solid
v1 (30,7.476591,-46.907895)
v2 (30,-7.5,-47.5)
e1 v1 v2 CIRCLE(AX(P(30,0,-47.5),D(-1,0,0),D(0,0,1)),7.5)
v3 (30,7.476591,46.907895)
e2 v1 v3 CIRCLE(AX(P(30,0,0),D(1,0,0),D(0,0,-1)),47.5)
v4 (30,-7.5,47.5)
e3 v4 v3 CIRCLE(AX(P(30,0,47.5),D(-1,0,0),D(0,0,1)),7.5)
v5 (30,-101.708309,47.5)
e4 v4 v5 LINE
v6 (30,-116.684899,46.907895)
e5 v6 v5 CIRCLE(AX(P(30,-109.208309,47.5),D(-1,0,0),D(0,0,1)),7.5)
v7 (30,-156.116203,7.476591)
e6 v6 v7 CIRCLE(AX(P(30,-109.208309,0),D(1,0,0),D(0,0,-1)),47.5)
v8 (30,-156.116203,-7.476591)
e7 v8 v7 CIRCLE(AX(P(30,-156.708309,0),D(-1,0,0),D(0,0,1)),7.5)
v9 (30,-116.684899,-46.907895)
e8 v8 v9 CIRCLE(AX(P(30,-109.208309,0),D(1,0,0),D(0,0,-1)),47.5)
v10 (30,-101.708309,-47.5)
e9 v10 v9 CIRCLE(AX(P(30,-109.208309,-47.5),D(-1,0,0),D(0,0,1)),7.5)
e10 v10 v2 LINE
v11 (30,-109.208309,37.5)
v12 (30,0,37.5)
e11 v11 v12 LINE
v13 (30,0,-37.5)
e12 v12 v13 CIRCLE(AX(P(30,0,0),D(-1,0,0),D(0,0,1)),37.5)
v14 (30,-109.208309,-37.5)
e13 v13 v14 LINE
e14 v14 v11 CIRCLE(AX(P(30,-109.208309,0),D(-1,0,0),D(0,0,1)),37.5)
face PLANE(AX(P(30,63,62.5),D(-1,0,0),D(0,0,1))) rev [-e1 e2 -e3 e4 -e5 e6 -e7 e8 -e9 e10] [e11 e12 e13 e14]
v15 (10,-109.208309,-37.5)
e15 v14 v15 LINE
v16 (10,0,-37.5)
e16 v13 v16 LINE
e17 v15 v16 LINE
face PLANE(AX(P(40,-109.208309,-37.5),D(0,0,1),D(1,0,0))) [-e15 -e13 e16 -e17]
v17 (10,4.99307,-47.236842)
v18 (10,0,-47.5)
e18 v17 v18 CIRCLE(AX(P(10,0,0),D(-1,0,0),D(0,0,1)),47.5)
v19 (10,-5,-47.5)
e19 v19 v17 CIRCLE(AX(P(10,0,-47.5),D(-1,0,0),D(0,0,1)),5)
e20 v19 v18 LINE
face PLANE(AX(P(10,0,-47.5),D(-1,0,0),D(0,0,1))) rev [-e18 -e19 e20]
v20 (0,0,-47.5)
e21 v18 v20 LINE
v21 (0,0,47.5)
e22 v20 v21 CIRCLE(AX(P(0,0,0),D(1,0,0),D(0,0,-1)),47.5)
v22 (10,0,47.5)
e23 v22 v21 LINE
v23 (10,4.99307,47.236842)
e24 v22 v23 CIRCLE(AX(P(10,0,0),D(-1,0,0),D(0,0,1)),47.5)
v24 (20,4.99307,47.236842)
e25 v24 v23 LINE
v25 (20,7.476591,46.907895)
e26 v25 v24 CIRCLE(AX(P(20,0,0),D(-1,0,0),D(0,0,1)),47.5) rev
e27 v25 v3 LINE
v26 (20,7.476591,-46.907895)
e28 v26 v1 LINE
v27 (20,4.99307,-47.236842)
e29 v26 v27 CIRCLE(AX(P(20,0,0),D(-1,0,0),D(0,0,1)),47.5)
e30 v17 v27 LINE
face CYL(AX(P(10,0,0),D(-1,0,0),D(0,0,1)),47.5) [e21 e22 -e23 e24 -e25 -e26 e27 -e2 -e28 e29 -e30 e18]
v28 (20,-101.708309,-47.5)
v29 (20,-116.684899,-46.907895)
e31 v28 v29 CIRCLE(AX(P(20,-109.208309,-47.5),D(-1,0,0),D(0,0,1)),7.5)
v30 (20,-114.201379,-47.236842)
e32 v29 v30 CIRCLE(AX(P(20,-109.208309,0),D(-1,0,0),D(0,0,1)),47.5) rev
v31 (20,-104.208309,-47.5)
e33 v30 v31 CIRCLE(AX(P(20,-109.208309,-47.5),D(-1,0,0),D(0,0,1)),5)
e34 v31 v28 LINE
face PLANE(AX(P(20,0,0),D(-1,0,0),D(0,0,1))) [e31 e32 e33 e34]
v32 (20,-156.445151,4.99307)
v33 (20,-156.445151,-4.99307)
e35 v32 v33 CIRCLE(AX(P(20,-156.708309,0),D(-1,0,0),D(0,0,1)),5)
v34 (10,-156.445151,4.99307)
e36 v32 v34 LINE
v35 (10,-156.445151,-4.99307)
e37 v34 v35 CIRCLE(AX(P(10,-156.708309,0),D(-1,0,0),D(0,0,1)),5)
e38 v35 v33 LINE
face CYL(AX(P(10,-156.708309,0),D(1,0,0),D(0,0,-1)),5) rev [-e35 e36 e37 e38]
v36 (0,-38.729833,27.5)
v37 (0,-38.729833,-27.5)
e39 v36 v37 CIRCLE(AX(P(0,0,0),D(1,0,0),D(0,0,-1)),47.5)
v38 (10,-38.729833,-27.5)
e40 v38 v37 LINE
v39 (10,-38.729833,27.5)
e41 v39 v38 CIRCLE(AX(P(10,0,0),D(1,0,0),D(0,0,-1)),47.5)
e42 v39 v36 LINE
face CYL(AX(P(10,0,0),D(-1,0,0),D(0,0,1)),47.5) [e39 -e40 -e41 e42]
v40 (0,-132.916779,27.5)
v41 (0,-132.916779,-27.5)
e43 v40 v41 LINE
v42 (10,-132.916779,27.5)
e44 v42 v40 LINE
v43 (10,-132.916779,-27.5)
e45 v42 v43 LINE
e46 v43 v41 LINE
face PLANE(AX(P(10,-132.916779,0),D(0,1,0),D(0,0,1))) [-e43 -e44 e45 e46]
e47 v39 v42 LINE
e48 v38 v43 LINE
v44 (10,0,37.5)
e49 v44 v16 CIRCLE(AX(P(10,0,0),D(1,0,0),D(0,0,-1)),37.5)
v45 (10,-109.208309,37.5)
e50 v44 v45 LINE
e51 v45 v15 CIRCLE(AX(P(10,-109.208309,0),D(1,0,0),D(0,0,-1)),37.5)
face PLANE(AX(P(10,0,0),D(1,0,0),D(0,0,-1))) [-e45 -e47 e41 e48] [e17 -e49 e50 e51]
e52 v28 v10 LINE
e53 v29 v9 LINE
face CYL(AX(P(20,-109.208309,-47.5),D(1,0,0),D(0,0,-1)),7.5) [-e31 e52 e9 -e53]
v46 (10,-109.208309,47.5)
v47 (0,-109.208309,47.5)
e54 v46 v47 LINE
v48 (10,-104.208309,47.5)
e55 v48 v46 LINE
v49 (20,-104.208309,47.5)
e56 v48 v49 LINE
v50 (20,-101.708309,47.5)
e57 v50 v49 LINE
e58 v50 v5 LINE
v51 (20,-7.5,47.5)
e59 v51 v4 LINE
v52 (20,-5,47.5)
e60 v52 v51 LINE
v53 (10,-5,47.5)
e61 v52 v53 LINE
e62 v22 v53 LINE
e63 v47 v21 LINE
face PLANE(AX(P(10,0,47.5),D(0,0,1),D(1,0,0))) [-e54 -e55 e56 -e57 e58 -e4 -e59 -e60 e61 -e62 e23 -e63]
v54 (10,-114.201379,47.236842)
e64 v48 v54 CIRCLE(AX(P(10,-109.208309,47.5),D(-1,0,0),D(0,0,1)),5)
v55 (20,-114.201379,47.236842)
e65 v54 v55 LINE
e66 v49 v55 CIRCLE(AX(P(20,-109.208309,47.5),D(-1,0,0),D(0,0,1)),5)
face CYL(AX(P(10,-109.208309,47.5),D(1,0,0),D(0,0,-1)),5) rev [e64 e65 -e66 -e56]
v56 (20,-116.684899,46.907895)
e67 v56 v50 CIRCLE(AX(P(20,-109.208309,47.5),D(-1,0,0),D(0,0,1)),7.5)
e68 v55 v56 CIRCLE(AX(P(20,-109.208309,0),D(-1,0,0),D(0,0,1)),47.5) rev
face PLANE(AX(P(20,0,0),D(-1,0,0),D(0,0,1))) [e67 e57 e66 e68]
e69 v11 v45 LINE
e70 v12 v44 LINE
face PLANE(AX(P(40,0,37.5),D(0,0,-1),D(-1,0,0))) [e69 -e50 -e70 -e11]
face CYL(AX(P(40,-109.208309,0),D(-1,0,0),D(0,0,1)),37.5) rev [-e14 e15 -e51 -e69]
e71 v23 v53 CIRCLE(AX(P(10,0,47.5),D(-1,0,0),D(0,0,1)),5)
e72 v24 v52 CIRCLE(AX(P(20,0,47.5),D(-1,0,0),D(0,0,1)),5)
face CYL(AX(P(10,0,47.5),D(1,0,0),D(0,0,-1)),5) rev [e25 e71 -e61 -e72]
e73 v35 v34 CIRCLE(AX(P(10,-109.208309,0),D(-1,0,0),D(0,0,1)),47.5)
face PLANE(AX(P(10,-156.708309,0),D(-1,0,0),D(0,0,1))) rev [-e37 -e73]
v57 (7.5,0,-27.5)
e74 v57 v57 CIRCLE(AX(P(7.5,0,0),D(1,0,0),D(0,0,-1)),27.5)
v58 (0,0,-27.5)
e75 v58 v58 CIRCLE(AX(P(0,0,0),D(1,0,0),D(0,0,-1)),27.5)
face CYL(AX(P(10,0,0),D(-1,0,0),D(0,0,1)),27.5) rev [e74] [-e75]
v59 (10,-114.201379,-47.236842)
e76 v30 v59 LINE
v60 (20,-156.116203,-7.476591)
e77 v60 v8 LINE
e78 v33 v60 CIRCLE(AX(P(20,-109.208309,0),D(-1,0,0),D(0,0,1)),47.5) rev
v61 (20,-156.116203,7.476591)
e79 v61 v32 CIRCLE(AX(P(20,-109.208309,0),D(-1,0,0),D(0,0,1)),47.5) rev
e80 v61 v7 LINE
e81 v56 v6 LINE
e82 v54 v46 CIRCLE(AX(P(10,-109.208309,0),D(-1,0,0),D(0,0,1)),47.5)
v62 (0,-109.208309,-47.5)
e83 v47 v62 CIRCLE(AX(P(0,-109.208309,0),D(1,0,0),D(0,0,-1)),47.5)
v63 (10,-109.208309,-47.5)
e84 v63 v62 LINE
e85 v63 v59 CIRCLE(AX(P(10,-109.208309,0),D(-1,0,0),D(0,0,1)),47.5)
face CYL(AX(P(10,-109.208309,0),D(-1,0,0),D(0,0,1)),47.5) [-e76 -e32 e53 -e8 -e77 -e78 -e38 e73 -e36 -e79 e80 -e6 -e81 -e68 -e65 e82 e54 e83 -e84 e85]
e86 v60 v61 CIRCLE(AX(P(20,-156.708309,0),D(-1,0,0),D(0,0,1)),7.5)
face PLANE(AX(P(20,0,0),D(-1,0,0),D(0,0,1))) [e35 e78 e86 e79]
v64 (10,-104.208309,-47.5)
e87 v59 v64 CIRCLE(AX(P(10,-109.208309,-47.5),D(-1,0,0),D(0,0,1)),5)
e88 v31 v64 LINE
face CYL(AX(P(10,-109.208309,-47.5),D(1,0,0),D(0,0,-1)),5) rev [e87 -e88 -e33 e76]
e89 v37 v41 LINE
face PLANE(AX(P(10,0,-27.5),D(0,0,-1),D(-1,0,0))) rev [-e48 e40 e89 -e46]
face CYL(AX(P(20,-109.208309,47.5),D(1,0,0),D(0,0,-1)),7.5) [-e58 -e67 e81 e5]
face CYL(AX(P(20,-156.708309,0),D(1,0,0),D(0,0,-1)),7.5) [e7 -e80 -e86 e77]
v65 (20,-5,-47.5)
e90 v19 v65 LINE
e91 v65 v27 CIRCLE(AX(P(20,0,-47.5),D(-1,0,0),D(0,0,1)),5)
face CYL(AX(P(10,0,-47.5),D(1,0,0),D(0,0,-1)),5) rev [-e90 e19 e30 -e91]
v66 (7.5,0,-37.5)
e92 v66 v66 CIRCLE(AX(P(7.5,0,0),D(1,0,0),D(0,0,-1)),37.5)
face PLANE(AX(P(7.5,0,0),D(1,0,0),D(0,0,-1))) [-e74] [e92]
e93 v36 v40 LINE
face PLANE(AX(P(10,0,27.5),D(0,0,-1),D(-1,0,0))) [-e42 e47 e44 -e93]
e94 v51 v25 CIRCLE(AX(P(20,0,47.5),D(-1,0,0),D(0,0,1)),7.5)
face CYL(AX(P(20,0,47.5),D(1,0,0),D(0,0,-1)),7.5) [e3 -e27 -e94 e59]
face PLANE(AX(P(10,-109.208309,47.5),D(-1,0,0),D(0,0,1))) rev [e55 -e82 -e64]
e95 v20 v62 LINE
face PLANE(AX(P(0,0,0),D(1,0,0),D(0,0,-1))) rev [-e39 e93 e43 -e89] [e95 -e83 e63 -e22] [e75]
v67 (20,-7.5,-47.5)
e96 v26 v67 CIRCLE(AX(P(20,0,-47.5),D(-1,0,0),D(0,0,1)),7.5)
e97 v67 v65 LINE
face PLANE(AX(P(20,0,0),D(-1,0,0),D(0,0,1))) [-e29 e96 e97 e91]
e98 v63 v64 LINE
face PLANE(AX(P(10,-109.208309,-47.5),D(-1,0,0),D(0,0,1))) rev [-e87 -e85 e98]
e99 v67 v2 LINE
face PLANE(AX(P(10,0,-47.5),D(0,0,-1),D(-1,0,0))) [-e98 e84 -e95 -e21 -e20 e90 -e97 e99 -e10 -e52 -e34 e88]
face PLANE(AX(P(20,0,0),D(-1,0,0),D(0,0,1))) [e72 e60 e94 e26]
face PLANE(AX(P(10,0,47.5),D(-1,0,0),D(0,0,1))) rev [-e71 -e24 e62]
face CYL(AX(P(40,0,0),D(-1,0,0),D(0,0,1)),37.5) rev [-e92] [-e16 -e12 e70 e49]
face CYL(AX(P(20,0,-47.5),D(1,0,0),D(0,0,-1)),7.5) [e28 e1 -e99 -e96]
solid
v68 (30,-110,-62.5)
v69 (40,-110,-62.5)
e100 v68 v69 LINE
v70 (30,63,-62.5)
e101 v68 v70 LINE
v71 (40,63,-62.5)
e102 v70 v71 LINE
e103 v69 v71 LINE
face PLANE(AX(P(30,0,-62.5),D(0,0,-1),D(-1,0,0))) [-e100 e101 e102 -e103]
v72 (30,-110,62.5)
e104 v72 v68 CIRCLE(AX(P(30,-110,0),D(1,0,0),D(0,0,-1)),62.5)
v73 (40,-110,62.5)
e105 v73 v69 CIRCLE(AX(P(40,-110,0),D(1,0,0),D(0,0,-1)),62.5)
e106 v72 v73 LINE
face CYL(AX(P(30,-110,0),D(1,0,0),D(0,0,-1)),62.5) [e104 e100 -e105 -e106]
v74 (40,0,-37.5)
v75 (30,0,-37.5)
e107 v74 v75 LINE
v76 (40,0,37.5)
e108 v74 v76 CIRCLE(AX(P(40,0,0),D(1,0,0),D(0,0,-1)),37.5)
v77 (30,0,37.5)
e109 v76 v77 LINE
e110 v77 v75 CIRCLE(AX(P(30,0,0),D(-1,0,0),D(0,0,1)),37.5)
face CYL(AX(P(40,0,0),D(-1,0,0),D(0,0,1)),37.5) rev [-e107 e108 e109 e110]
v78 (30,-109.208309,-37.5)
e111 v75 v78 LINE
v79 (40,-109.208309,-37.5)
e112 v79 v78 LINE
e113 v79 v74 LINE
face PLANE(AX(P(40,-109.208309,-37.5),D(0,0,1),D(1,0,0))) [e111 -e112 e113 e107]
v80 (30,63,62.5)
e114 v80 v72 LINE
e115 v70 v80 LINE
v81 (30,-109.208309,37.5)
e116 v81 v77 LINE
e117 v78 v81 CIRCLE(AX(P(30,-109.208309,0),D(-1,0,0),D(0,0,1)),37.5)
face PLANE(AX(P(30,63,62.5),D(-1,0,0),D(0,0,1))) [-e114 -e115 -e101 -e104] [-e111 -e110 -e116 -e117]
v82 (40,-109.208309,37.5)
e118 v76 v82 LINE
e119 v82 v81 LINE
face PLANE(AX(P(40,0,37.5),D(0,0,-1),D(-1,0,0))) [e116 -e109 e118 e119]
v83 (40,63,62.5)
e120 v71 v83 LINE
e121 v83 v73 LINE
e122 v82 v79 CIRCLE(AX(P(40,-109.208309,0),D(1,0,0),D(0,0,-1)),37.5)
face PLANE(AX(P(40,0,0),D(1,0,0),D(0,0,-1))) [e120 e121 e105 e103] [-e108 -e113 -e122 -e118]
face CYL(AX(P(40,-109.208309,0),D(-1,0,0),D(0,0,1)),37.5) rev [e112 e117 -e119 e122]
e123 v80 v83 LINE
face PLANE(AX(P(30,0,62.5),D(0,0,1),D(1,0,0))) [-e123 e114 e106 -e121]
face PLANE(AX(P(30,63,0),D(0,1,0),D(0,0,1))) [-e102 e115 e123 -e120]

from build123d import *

# Parameters (mm, degrees)
SKETCH1_R           = 27.5
BOSS_EXTRUDE1_DEPTH = 10
BOSS_EXTRUDE2_DEPTH = 30
BOSS_EXTRUDE4_START = -10
BOSS_EXTRUDE4_DEPTH = 10
CUT_EXTRUDE1_START  = -2.5
SKETCH7_R           = 37.5
SKETCH7_R_2         = 27.25
CUT_EXTRUDE1_DEPTH  = 2.5
BOSS_EXTRUDE5_START = 10
BOSS_EXTRUDE5_DEPTH = 10
SKETCH9_R           = 5
CUT_EXTRUDE2_DEPTH  = 10


# Read off the part's stored shape, not the designer's step: Split1
with BuildPart() as part:
    # Sketch1 → Boss-Extrude1 (new body)
    with BuildSketch(Plane(origin=(0, 0, 0), x_dir=(0, 0, -1), z_dir=(1, 0, 0))):
        with BuildLine():
            Line((47.5, 0), (47.5, -109.208308594))
            ThreePointArc((47.5, -109.208308594), (0, -156.708308594), (-47.5, -109.208308594))
            Line((-47.5, -109.208308594), (-47.5, 0))
            ThreePointArc((-47.5, 0), (0, 47.5), (47.5, 0))
        make_face()
        Circle(SKETCH1_R, mode=Mode.SUBTRACT)
        with BuildLine():
            Line((27.5, -38.729833462), (27.5, -132.916779119))
            Line((27.5, -132.916779119), (-27.5, -132.916779119))
            Line((-27.5, -132.916779119), (-27.5, -38.729833462))
            ThreePointArc((-27.5, -38.729833462), (0, -47.5), (27.5, -38.729833462))
        make_face(mode=Mode.SUBTRACT)
    extrude(amount=BOSS_EXTRUDE1_DEPTH)

    # Sketch2 → Boss-Extrude2 (add)
    with BuildSketch(Plane(origin=(10, 0, 0), x_dir=(0, 0, -1), z_dir=(1, 0, 0))):
        with BuildLine():
            Line((-47.5, 0), (-47.5, -109.208308594))
            ThreePointArc((-47.5, -109.208308594), (0, -156.708308594), (47.5, -109.208308594))
            Line((47.5, -109.208308594), (47.5, 0))
            ThreePointArc((47.5, 0), (0, 47.5), (-47.5, 0))
        make_face()
        with BuildLine():
            Line((37.5, -109.208308594), (37.5, 0))
            ThreePointArc((37.5, 0), (0, 37.5), (-37.5, 0))
            Line((-37.5, 0), (-37.5, -109.208308594))
            ThreePointArc((-37.5, -109.208308594), (0, -146.708308594), (37.5, -109.208308594))
        make_face(mode=Mode.SUBTRACT)
    extrude(amount=BOSS_EXTRUDE2_DEPTH)

    # Sketch4 → Boss-Extrude4 (add)
    with BuildSketch(Plane(origin=(40, 0, 0), x_dir=(0, 0, -1), z_dir=(1, 0, 0)).offset(BOSS_EXTRUDE4_START)):
        with BuildLine():
            Line((62.5, -110), (62.5, 63))
            Line((62.5, 63), (-62.5, 63))
            Line((-62.5, 63), (-62.5, -110))
            ThreePointArc((-62.5, -110), (0, -172.5), (62.5, -110))
        make_face()
        with BuildLine():
            Line((-47.5, -109.208308594), (-47.5, 0))
            ThreePointArc((-47.5, 0), (0, 47.5), (47.5, 0))
            Line((47.5, 0), (47.5, -109.208308594))
            ThreePointArc((47.5, -109.208308594), (0, -156.708308594), (-47.5, -109.208308594))
        make_face(mode=Mode.SUBTRACT)
    extrude(amount=BOSS_EXTRUDE4_DEPTH)

    # Sketch7 → Cut-Extrude1 (cut)
    with BuildSketch(Plane(origin=(10, 0, 0), x_dir=(0, 0, -1), z_dir=(1, 0, 0)).offset(CUT_EXTRUDE1_START)):
        Circle(SKETCH7_R)
        Circle(SKETCH7_R_2, mode=Mode.SUBTRACT)
    extrude(amount=CUT_EXTRUDE1_DEPTH, mode=Mode.SUBTRACT)

    # Sketch8 → Boss-Extrude5 (add)
    with BuildSketch(Plane.ZY.offset(-30).offset(BOSS_EXTRUDE5_START)):
        with BuildLine():
            ThreePointArc((-47.5, -101.708308594), (-54.994145438, -109.504592507), (-46.907894737, -116.684899485))
            ThreePointArc((-46.907894737, -116.684899485), (-47.351742312, -112.958308594), (-47.5, -109.208308594))
            Line((-47.5, -109.208308594), (-47.5, -101.708308594))
        make_face()
        with BuildLine():
            ThreePointArc((7.5, -156.708308594), (7.494145438, -156.41202468), (7.476590891, -156.11620333))
            ThreePointArc((7.476590891, -156.11620333), (0, -156.708308594), (-7.476590891, -156.11620333))
            ThreePointArc((-7.476590891, -156.11620333), (-0.296283913, -164.202454031), (7.5, -156.708308594))
        make_face()
        with BuildLine():
            Line((47.5, -101.708308594), (47.5, -109.208308594))
            ThreePointArc((47.5, -109.208308594), (47.351742312, -112.958308594), (46.907894737, -116.684899485))
            ThreePointArc((46.907894737, -116.684899485), (52.589656694, -114.716974016), (55, -109.208308594))
            ThreePointArc((55, -109.208308594), (52.803300859, -103.905007735), (47.5, -101.708308594))
        make_face()
        with BuildLine():
            Line((47.5, 0), (47.5, -7.5))
            ThreePointArc((47.5, -7.5), (52.803300859, -5.303300859), (55, 0))
            ThreePointArc((55, 0), (52.589656694, 5.508665422), (46.907894737, 7.476590891))
            ThreePointArc((46.907894737, 7.476590891), (47.351742312, 3.75), (47.5, 0))
        make_face()
        with BuildLine():
            ThreePointArc((-47.5, 0), (-47.351742312, 3.75), (-46.907894737, 7.476590891))
            ThreePointArc((-46.907894737, 7.476590891), (-54.994145438, 0.296283913), (-47.5, -7.5))
            Line((-47.5, -7.5), (-47.5, 0))
        make_face()
        with BuildLine():
            ThreePointArc((-40, 0), (-41.991334578, 5.089656694), (-46.907894737, 7.476590891))
            ThreePointArc((-46.907894737, 7.476590891), (-47.351742312, 3.75), (-47.5, 0))
            Line((-47.5, 0), (-47.5, -7.5))
            ThreePointArc((-47.5, -7.5), (-42.196699141, -5.303300859), (-40, 0))
        make_face()
    extrude(amount=-BOSS_EXTRUDE5_DEPTH)

    # Sketch9 → Cut-Extrude2 (cut)
    with BuildSketch(Plane.ZY.offset(-20)):
        with Locations((0, -156.708308594)):
            Circle(SKETCH9_R)
        with Locations((47.5, -109.208308594)):
            Circle(SKETCH9_R)
        with Locations((47.5, 0)):
            Circle(SKETCH9_R)
        with Locations((-47.5, 0)):
            Circle(SKETCH9_R)
        with Locations((-47.5, -109.208308594)):
            Circle(SKETCH9_R)
    extrude(amount=CUT_EXTRUDE2_DEPTH, mode=Mode.SUBTRACT)


with BuildPart() as body_2:
    # Split1: the piece on the far side of the plane
    add(part.part)
    split(bisect_by=Plane.YZ.offset(30), keep=Keep.BOTTOM)


with BuildPart() as part_1:
    add(part.part)

    # Split1
    split(bisect_by=Plane.YZ.offset(30), keep=Keep.TOP)


solid = Compound([body_2.part, part_1.part])
